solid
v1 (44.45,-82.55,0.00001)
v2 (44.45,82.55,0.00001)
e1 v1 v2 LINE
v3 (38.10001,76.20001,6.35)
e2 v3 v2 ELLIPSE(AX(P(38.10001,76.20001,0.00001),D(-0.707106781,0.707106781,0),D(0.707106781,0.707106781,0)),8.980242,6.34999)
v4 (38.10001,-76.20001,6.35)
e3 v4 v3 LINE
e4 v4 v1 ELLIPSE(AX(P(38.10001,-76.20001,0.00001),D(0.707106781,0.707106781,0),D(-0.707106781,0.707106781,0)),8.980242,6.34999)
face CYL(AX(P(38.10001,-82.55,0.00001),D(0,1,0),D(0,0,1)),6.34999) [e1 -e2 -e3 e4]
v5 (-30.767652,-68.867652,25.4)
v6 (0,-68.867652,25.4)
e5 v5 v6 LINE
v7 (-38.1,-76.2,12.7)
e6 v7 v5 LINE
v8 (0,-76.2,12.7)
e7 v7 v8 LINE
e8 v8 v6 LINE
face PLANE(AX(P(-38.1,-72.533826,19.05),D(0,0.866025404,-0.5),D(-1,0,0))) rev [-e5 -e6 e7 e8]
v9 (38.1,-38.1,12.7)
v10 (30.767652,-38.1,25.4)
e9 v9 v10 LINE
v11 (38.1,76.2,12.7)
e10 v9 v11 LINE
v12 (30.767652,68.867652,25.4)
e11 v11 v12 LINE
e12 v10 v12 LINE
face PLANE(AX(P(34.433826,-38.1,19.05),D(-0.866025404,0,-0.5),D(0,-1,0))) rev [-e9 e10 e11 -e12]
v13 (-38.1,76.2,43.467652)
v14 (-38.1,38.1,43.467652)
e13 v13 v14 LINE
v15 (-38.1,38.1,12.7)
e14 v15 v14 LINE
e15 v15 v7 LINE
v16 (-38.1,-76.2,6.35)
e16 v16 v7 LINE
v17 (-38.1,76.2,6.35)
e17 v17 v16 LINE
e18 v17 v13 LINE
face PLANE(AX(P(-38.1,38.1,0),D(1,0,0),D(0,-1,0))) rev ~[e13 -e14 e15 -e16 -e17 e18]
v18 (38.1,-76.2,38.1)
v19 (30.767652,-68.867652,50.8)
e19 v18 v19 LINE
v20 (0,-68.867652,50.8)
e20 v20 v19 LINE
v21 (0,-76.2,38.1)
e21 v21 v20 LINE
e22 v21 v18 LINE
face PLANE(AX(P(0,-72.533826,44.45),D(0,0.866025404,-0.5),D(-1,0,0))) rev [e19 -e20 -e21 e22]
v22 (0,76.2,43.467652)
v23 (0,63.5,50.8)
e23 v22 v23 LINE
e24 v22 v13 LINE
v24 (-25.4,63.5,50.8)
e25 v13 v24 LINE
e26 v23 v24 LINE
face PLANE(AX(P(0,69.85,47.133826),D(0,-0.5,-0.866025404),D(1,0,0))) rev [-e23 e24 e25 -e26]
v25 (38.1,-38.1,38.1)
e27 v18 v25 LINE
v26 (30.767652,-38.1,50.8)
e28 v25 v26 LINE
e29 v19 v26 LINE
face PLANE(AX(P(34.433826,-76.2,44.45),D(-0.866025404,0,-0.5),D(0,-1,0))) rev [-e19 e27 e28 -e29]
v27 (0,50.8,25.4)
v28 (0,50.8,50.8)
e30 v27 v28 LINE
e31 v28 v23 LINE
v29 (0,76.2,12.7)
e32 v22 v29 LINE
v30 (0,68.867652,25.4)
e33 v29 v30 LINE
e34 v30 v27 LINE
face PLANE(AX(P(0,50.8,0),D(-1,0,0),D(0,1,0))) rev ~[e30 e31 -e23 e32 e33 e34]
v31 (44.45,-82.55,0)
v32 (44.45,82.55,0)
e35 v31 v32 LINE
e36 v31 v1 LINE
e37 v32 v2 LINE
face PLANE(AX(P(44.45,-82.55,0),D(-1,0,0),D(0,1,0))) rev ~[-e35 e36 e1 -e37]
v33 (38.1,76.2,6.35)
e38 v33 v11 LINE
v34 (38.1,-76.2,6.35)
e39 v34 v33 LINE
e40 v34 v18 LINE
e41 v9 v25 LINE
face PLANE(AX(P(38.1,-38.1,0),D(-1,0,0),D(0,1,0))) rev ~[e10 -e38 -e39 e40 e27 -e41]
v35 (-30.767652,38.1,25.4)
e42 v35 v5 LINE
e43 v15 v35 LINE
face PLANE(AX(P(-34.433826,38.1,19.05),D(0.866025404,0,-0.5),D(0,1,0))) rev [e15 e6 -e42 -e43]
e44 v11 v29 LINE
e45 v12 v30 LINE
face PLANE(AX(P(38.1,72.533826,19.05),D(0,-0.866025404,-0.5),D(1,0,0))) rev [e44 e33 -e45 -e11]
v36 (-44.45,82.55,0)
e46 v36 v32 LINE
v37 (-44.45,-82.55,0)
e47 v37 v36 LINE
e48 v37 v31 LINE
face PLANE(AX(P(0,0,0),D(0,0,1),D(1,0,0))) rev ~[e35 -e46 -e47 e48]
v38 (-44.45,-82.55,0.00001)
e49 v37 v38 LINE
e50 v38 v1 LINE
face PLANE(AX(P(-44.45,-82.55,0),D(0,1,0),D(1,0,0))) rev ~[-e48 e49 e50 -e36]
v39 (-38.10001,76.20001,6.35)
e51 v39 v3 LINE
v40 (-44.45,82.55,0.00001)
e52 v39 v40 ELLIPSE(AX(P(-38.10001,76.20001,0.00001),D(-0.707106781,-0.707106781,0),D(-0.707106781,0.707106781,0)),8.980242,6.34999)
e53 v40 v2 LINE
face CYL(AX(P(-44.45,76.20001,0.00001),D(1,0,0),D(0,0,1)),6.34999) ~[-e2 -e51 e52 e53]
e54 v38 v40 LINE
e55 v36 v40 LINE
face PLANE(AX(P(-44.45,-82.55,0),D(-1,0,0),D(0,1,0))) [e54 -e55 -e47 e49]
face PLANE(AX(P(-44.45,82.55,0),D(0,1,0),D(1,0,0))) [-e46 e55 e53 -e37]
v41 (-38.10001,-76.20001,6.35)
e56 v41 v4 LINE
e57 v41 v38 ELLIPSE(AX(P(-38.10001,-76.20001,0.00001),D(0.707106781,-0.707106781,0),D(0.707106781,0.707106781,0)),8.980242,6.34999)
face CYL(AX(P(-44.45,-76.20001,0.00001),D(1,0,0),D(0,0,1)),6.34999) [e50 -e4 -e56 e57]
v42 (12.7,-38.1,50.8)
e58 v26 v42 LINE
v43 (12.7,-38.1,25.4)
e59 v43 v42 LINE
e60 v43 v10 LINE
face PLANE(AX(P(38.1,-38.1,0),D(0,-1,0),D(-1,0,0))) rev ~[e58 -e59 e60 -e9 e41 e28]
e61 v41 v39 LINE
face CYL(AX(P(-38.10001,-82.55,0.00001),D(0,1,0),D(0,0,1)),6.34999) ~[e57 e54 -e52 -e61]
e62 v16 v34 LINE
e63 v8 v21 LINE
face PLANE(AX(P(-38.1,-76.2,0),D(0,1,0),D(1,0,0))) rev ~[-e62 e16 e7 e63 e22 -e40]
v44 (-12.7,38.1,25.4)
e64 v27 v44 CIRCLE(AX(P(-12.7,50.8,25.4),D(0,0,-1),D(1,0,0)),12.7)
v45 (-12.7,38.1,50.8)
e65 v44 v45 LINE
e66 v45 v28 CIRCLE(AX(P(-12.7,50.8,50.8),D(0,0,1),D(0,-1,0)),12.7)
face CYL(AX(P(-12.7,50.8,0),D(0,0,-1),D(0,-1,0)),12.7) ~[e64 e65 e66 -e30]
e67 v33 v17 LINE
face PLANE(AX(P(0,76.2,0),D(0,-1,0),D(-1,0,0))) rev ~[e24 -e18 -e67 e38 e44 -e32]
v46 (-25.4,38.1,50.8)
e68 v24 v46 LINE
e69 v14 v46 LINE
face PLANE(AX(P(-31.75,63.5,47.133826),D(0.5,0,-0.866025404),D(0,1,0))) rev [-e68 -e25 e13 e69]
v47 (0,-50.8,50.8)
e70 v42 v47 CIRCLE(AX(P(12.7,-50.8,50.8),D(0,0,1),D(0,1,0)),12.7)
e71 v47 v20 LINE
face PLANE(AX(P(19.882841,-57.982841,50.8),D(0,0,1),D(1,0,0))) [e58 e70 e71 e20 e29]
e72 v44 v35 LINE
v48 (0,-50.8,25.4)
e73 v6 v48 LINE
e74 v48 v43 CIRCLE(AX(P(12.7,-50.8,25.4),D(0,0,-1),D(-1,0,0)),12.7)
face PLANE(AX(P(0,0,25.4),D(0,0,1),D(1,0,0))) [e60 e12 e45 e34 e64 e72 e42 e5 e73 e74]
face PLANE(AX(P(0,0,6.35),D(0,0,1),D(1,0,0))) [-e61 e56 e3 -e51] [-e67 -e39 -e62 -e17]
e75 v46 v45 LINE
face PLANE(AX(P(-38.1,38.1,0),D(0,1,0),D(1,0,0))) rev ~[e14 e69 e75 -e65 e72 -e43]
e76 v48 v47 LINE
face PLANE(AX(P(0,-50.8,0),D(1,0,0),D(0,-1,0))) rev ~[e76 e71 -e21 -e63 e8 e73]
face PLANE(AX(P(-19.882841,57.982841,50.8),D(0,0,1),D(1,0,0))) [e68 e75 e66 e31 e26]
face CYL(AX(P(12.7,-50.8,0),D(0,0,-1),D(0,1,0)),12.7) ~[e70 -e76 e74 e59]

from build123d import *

# Parameters (mm, degrees)
F0_W        = 88.9
F0_H        = 165.1
F1_DEPTH    = 6.35
F2_DEPTH    = 25.4
F3_DEPTH    = 50.8
F4_R        = 6.34999
F5_C1_SIZE2 = 7.3323484187
F5_C1_SIZE  = 12.7
F5_C2_SIZE2 = 12.7
F5_C2_SIZE  = 7.3323484187
F5_C3_SIZE2 = 7.3323484187
F5_C3_SIZE  = 12.7
F5_C4_SIZE2 = 7.3323484187
F5_C4_SIZE  = 12.7
F5_C5_SIZE2 = 7.3323484187
F5_C5_SIZE  = 12.7
F5_C6_SIZE2 = 7.3323484187
F5_C6_SIZE  = 12.7
F5_C7_SIZE2 = 12.7
F5_C7_SIZE  = 7.3323484187
F5_C8_SIZE2 = 7.3323484187
F5_C8_SIZE  = 12.7


# Not quite as in the source:
# - a fillet or chamfer is up to 0.001 mm smaller than in the source, because OpenCascade refuses the exact size


with BuildPart() as f1:
    # F0 (on Top) → F1 (new body)
    with BuildSketch(Plane.XY):
        Rectangle(F0_W, F0_H)
        Polygon((0, 76.2), (38.1, 76.2), (38.1, -38.1), (38.1, -76.2), (0, -76.2), (-38.1, -76.2), (-38.1, 38.1), (-38.1, 76.2), align=None, mode=Mode.SUBTRACT)
    extrude(amount=F1_DEPTH)

    # F0 (on Top) → F2 (join)
    with BuildSketch(Plane.XY):
        with BuildLine():
            Line((38.1, -38.1), (38.1, 76.2))
            Line((38.1, 76.2), (0, 76.2))
            Line((0, 76.2), (0, 50.8))
            ThreePointArc((0, 50.8), (-3.7197438789, 41.8197438789), (-12.7, 38.1))
            Line((-12.7, 38.1), (-38.1, 38.1))
            Line((-38.1, 38.1), (-38.1, -76.2))
            Line((-38.1, -76.2), (0, -76.2))
            Line((0, -76.2), (0, -50.8))
            ThreePointArc((0, -50.8), (3.7197438789, -41.8197438789), (12.7, -38.1))
            Line((12.7, -38.1), (38.1, -38.1))
        make_face()
    extrude(amount=F2_DEPTH)

    # F0 (on Top) → F3 (join)
    with BuildSketch(Plane.XY):
        with BuildLine():
            Line((0, 50.8), (0, 76.2))
            Line((0, 76.2), (-38.1, 76.2))
            Line((-38.1, 76.2), (-38.1, 38.1))
            Line((-38.1, 38.1), (-12.7, 38.1))
            ThreePointArc((-12.7, 38.1), (-3.7197438789, 41.8197438789), (0, 50.8))
        make_face()
        with BuildLine():
            Line((38.1, -76.2), (38.1, -38.1))
            Line((38.1, -38.1), (12.7, -38.1))
            ThreePointArc((12.7, -38.1), (3.7197438789, -41.8197438789), (0, -50.8))
            Line((0, -50.8), (0, -76.2))
            Line((0, -76.2), (38.1, -76.2))
        make_face()
    extrude(amount=F3_DEPTH)

    # F4 (radius 6.35 in the source; OpenCascade refuses exactly that, so slightly less here)
    f4_edges = [f1.edges().sort_by_distance(p)[0] for p in [
        (44.45, 0, 6.35),
        (0, -82.55, 6.35),
        (-44.45, 0, 6.35),
        (0, 82.55, 6.35),
    ]]
    fillet(f4_edges, radius=F4_R)

    # F5: chamfer of 12.7 x 7.3323484187 on 8 edges, made by hand

    # F5_c1
    f5_c1_edges = [f1.edges().sort_by_distance(p)[0] for p in [
        (19.05, 76.2, 25.4),
    ]]
    f5_c1_side = f1.faces().sort_by_distance((19.05, 76.2, 25.2533530316))[0]
    chamfer(f5_c1_edges, length=F5_C1_SIZE, length2=F5_C1_SIZE2, reference=f5_c1_side)

    # F5_c2
    f5_c2_edges = [f1.edges().sort_by_distance(p)[0] for p in [
        (-19.05, 76.2, 50.8),
    ]]
    f5_c2_side = f1.faces().sort_by_distance((-19.05, 76.2, 50.6533530316))[0]
    chamfer(f5_c2_edges, length=F5_C2_SIZE, length2=F5_C2_SIZE2, reference=f5_c2_side)

    # F5_c3
    f5_c3_edges = [f1.edges().sort_by_distance(p)[0] for p in [
        (38.1, -57.15, 50.8),
    ]]
    f5_c3_side = f1.faces().sort_by_distance((38.1, -57.15, 50.6533530316))[0]
    chamfer(f5_c3_edges, length=F5_C3_SIZE, length2=F5_C3_SIZE2, reference=f5_c3_side)

    # F5_c4
    f5_c4_edges = [f1.edges().sort_by_distance(p)[0] for p in [
        (38.1, 15.3838257906, 25.4),
    ]]
    f5_c4_side = f1.faces().sort_by_distance((38.1, 15.3838257906, 25.2533530316))[0]
    chamfer(f5_c4_edges, length=F5_C4_SIZE, length2=F5_C4_SIZE2, reference=f5_c4_side)

    # F5_c5
    f5_c5_edges = [f1.edges().sort_by_distance(p)[0] for p in [
        (-19.05, -76.2, 25.4),
    ]]
    f5_c5_side = f1.faces().sort_by_distance((-19.05, -76.2, 25.2533530316))[0]
    chamfer(f5_c5_edges, length=F5_C5_SIZE, length2=F5_C5_SIZE2, reference=f5_c5_side)

    # F5_c6
    f5_c6_edges = [f1.edges().sort_by_distance(p)[0] for p in [
        (15.3838257906, -76.2, 50.8),
    ]]
    f5_c6_side = f1.faces().sort_by_distance((15.3838257906, -76.2, 50.6533530316))[0]
    chamfer(f5_c6_edges, length=F5_C6_SIZE, length2=F5_C6_SIZE2, reference=f5_c6_side)

    # F5_c7
    f5_c7_edges = [f1.edges().sort_by_distance(p)[0] for p in [
        (-38.1, 50.8, 50.8),
    ]]
    f5_c7_side = f1.faces().sort_by_distance((-38.1, 50.8, 50.6533530316))[0]
    chamfer(f5_c7_edges, length=F5_C7_SIZE, length2=F5_C7_SIZE2, reference=f5_c7_side)

    # F5_c8
    f5_c8_edges = [f1.edges().sort_by_distance(p)[0] for p in [
        (-38.1, -15.3838257906, 25.4),
    ]]
    f5_c8_side = f1.faces().sort_by_distance((-38.1, -15.3838257906, 25.2533530316))[0]
    chamfer(f5_c8_edges, length=F5_C8_SIZE, length2=F5_C8_SIZE2, reference=f5_c8_side)


solid = f1.part
